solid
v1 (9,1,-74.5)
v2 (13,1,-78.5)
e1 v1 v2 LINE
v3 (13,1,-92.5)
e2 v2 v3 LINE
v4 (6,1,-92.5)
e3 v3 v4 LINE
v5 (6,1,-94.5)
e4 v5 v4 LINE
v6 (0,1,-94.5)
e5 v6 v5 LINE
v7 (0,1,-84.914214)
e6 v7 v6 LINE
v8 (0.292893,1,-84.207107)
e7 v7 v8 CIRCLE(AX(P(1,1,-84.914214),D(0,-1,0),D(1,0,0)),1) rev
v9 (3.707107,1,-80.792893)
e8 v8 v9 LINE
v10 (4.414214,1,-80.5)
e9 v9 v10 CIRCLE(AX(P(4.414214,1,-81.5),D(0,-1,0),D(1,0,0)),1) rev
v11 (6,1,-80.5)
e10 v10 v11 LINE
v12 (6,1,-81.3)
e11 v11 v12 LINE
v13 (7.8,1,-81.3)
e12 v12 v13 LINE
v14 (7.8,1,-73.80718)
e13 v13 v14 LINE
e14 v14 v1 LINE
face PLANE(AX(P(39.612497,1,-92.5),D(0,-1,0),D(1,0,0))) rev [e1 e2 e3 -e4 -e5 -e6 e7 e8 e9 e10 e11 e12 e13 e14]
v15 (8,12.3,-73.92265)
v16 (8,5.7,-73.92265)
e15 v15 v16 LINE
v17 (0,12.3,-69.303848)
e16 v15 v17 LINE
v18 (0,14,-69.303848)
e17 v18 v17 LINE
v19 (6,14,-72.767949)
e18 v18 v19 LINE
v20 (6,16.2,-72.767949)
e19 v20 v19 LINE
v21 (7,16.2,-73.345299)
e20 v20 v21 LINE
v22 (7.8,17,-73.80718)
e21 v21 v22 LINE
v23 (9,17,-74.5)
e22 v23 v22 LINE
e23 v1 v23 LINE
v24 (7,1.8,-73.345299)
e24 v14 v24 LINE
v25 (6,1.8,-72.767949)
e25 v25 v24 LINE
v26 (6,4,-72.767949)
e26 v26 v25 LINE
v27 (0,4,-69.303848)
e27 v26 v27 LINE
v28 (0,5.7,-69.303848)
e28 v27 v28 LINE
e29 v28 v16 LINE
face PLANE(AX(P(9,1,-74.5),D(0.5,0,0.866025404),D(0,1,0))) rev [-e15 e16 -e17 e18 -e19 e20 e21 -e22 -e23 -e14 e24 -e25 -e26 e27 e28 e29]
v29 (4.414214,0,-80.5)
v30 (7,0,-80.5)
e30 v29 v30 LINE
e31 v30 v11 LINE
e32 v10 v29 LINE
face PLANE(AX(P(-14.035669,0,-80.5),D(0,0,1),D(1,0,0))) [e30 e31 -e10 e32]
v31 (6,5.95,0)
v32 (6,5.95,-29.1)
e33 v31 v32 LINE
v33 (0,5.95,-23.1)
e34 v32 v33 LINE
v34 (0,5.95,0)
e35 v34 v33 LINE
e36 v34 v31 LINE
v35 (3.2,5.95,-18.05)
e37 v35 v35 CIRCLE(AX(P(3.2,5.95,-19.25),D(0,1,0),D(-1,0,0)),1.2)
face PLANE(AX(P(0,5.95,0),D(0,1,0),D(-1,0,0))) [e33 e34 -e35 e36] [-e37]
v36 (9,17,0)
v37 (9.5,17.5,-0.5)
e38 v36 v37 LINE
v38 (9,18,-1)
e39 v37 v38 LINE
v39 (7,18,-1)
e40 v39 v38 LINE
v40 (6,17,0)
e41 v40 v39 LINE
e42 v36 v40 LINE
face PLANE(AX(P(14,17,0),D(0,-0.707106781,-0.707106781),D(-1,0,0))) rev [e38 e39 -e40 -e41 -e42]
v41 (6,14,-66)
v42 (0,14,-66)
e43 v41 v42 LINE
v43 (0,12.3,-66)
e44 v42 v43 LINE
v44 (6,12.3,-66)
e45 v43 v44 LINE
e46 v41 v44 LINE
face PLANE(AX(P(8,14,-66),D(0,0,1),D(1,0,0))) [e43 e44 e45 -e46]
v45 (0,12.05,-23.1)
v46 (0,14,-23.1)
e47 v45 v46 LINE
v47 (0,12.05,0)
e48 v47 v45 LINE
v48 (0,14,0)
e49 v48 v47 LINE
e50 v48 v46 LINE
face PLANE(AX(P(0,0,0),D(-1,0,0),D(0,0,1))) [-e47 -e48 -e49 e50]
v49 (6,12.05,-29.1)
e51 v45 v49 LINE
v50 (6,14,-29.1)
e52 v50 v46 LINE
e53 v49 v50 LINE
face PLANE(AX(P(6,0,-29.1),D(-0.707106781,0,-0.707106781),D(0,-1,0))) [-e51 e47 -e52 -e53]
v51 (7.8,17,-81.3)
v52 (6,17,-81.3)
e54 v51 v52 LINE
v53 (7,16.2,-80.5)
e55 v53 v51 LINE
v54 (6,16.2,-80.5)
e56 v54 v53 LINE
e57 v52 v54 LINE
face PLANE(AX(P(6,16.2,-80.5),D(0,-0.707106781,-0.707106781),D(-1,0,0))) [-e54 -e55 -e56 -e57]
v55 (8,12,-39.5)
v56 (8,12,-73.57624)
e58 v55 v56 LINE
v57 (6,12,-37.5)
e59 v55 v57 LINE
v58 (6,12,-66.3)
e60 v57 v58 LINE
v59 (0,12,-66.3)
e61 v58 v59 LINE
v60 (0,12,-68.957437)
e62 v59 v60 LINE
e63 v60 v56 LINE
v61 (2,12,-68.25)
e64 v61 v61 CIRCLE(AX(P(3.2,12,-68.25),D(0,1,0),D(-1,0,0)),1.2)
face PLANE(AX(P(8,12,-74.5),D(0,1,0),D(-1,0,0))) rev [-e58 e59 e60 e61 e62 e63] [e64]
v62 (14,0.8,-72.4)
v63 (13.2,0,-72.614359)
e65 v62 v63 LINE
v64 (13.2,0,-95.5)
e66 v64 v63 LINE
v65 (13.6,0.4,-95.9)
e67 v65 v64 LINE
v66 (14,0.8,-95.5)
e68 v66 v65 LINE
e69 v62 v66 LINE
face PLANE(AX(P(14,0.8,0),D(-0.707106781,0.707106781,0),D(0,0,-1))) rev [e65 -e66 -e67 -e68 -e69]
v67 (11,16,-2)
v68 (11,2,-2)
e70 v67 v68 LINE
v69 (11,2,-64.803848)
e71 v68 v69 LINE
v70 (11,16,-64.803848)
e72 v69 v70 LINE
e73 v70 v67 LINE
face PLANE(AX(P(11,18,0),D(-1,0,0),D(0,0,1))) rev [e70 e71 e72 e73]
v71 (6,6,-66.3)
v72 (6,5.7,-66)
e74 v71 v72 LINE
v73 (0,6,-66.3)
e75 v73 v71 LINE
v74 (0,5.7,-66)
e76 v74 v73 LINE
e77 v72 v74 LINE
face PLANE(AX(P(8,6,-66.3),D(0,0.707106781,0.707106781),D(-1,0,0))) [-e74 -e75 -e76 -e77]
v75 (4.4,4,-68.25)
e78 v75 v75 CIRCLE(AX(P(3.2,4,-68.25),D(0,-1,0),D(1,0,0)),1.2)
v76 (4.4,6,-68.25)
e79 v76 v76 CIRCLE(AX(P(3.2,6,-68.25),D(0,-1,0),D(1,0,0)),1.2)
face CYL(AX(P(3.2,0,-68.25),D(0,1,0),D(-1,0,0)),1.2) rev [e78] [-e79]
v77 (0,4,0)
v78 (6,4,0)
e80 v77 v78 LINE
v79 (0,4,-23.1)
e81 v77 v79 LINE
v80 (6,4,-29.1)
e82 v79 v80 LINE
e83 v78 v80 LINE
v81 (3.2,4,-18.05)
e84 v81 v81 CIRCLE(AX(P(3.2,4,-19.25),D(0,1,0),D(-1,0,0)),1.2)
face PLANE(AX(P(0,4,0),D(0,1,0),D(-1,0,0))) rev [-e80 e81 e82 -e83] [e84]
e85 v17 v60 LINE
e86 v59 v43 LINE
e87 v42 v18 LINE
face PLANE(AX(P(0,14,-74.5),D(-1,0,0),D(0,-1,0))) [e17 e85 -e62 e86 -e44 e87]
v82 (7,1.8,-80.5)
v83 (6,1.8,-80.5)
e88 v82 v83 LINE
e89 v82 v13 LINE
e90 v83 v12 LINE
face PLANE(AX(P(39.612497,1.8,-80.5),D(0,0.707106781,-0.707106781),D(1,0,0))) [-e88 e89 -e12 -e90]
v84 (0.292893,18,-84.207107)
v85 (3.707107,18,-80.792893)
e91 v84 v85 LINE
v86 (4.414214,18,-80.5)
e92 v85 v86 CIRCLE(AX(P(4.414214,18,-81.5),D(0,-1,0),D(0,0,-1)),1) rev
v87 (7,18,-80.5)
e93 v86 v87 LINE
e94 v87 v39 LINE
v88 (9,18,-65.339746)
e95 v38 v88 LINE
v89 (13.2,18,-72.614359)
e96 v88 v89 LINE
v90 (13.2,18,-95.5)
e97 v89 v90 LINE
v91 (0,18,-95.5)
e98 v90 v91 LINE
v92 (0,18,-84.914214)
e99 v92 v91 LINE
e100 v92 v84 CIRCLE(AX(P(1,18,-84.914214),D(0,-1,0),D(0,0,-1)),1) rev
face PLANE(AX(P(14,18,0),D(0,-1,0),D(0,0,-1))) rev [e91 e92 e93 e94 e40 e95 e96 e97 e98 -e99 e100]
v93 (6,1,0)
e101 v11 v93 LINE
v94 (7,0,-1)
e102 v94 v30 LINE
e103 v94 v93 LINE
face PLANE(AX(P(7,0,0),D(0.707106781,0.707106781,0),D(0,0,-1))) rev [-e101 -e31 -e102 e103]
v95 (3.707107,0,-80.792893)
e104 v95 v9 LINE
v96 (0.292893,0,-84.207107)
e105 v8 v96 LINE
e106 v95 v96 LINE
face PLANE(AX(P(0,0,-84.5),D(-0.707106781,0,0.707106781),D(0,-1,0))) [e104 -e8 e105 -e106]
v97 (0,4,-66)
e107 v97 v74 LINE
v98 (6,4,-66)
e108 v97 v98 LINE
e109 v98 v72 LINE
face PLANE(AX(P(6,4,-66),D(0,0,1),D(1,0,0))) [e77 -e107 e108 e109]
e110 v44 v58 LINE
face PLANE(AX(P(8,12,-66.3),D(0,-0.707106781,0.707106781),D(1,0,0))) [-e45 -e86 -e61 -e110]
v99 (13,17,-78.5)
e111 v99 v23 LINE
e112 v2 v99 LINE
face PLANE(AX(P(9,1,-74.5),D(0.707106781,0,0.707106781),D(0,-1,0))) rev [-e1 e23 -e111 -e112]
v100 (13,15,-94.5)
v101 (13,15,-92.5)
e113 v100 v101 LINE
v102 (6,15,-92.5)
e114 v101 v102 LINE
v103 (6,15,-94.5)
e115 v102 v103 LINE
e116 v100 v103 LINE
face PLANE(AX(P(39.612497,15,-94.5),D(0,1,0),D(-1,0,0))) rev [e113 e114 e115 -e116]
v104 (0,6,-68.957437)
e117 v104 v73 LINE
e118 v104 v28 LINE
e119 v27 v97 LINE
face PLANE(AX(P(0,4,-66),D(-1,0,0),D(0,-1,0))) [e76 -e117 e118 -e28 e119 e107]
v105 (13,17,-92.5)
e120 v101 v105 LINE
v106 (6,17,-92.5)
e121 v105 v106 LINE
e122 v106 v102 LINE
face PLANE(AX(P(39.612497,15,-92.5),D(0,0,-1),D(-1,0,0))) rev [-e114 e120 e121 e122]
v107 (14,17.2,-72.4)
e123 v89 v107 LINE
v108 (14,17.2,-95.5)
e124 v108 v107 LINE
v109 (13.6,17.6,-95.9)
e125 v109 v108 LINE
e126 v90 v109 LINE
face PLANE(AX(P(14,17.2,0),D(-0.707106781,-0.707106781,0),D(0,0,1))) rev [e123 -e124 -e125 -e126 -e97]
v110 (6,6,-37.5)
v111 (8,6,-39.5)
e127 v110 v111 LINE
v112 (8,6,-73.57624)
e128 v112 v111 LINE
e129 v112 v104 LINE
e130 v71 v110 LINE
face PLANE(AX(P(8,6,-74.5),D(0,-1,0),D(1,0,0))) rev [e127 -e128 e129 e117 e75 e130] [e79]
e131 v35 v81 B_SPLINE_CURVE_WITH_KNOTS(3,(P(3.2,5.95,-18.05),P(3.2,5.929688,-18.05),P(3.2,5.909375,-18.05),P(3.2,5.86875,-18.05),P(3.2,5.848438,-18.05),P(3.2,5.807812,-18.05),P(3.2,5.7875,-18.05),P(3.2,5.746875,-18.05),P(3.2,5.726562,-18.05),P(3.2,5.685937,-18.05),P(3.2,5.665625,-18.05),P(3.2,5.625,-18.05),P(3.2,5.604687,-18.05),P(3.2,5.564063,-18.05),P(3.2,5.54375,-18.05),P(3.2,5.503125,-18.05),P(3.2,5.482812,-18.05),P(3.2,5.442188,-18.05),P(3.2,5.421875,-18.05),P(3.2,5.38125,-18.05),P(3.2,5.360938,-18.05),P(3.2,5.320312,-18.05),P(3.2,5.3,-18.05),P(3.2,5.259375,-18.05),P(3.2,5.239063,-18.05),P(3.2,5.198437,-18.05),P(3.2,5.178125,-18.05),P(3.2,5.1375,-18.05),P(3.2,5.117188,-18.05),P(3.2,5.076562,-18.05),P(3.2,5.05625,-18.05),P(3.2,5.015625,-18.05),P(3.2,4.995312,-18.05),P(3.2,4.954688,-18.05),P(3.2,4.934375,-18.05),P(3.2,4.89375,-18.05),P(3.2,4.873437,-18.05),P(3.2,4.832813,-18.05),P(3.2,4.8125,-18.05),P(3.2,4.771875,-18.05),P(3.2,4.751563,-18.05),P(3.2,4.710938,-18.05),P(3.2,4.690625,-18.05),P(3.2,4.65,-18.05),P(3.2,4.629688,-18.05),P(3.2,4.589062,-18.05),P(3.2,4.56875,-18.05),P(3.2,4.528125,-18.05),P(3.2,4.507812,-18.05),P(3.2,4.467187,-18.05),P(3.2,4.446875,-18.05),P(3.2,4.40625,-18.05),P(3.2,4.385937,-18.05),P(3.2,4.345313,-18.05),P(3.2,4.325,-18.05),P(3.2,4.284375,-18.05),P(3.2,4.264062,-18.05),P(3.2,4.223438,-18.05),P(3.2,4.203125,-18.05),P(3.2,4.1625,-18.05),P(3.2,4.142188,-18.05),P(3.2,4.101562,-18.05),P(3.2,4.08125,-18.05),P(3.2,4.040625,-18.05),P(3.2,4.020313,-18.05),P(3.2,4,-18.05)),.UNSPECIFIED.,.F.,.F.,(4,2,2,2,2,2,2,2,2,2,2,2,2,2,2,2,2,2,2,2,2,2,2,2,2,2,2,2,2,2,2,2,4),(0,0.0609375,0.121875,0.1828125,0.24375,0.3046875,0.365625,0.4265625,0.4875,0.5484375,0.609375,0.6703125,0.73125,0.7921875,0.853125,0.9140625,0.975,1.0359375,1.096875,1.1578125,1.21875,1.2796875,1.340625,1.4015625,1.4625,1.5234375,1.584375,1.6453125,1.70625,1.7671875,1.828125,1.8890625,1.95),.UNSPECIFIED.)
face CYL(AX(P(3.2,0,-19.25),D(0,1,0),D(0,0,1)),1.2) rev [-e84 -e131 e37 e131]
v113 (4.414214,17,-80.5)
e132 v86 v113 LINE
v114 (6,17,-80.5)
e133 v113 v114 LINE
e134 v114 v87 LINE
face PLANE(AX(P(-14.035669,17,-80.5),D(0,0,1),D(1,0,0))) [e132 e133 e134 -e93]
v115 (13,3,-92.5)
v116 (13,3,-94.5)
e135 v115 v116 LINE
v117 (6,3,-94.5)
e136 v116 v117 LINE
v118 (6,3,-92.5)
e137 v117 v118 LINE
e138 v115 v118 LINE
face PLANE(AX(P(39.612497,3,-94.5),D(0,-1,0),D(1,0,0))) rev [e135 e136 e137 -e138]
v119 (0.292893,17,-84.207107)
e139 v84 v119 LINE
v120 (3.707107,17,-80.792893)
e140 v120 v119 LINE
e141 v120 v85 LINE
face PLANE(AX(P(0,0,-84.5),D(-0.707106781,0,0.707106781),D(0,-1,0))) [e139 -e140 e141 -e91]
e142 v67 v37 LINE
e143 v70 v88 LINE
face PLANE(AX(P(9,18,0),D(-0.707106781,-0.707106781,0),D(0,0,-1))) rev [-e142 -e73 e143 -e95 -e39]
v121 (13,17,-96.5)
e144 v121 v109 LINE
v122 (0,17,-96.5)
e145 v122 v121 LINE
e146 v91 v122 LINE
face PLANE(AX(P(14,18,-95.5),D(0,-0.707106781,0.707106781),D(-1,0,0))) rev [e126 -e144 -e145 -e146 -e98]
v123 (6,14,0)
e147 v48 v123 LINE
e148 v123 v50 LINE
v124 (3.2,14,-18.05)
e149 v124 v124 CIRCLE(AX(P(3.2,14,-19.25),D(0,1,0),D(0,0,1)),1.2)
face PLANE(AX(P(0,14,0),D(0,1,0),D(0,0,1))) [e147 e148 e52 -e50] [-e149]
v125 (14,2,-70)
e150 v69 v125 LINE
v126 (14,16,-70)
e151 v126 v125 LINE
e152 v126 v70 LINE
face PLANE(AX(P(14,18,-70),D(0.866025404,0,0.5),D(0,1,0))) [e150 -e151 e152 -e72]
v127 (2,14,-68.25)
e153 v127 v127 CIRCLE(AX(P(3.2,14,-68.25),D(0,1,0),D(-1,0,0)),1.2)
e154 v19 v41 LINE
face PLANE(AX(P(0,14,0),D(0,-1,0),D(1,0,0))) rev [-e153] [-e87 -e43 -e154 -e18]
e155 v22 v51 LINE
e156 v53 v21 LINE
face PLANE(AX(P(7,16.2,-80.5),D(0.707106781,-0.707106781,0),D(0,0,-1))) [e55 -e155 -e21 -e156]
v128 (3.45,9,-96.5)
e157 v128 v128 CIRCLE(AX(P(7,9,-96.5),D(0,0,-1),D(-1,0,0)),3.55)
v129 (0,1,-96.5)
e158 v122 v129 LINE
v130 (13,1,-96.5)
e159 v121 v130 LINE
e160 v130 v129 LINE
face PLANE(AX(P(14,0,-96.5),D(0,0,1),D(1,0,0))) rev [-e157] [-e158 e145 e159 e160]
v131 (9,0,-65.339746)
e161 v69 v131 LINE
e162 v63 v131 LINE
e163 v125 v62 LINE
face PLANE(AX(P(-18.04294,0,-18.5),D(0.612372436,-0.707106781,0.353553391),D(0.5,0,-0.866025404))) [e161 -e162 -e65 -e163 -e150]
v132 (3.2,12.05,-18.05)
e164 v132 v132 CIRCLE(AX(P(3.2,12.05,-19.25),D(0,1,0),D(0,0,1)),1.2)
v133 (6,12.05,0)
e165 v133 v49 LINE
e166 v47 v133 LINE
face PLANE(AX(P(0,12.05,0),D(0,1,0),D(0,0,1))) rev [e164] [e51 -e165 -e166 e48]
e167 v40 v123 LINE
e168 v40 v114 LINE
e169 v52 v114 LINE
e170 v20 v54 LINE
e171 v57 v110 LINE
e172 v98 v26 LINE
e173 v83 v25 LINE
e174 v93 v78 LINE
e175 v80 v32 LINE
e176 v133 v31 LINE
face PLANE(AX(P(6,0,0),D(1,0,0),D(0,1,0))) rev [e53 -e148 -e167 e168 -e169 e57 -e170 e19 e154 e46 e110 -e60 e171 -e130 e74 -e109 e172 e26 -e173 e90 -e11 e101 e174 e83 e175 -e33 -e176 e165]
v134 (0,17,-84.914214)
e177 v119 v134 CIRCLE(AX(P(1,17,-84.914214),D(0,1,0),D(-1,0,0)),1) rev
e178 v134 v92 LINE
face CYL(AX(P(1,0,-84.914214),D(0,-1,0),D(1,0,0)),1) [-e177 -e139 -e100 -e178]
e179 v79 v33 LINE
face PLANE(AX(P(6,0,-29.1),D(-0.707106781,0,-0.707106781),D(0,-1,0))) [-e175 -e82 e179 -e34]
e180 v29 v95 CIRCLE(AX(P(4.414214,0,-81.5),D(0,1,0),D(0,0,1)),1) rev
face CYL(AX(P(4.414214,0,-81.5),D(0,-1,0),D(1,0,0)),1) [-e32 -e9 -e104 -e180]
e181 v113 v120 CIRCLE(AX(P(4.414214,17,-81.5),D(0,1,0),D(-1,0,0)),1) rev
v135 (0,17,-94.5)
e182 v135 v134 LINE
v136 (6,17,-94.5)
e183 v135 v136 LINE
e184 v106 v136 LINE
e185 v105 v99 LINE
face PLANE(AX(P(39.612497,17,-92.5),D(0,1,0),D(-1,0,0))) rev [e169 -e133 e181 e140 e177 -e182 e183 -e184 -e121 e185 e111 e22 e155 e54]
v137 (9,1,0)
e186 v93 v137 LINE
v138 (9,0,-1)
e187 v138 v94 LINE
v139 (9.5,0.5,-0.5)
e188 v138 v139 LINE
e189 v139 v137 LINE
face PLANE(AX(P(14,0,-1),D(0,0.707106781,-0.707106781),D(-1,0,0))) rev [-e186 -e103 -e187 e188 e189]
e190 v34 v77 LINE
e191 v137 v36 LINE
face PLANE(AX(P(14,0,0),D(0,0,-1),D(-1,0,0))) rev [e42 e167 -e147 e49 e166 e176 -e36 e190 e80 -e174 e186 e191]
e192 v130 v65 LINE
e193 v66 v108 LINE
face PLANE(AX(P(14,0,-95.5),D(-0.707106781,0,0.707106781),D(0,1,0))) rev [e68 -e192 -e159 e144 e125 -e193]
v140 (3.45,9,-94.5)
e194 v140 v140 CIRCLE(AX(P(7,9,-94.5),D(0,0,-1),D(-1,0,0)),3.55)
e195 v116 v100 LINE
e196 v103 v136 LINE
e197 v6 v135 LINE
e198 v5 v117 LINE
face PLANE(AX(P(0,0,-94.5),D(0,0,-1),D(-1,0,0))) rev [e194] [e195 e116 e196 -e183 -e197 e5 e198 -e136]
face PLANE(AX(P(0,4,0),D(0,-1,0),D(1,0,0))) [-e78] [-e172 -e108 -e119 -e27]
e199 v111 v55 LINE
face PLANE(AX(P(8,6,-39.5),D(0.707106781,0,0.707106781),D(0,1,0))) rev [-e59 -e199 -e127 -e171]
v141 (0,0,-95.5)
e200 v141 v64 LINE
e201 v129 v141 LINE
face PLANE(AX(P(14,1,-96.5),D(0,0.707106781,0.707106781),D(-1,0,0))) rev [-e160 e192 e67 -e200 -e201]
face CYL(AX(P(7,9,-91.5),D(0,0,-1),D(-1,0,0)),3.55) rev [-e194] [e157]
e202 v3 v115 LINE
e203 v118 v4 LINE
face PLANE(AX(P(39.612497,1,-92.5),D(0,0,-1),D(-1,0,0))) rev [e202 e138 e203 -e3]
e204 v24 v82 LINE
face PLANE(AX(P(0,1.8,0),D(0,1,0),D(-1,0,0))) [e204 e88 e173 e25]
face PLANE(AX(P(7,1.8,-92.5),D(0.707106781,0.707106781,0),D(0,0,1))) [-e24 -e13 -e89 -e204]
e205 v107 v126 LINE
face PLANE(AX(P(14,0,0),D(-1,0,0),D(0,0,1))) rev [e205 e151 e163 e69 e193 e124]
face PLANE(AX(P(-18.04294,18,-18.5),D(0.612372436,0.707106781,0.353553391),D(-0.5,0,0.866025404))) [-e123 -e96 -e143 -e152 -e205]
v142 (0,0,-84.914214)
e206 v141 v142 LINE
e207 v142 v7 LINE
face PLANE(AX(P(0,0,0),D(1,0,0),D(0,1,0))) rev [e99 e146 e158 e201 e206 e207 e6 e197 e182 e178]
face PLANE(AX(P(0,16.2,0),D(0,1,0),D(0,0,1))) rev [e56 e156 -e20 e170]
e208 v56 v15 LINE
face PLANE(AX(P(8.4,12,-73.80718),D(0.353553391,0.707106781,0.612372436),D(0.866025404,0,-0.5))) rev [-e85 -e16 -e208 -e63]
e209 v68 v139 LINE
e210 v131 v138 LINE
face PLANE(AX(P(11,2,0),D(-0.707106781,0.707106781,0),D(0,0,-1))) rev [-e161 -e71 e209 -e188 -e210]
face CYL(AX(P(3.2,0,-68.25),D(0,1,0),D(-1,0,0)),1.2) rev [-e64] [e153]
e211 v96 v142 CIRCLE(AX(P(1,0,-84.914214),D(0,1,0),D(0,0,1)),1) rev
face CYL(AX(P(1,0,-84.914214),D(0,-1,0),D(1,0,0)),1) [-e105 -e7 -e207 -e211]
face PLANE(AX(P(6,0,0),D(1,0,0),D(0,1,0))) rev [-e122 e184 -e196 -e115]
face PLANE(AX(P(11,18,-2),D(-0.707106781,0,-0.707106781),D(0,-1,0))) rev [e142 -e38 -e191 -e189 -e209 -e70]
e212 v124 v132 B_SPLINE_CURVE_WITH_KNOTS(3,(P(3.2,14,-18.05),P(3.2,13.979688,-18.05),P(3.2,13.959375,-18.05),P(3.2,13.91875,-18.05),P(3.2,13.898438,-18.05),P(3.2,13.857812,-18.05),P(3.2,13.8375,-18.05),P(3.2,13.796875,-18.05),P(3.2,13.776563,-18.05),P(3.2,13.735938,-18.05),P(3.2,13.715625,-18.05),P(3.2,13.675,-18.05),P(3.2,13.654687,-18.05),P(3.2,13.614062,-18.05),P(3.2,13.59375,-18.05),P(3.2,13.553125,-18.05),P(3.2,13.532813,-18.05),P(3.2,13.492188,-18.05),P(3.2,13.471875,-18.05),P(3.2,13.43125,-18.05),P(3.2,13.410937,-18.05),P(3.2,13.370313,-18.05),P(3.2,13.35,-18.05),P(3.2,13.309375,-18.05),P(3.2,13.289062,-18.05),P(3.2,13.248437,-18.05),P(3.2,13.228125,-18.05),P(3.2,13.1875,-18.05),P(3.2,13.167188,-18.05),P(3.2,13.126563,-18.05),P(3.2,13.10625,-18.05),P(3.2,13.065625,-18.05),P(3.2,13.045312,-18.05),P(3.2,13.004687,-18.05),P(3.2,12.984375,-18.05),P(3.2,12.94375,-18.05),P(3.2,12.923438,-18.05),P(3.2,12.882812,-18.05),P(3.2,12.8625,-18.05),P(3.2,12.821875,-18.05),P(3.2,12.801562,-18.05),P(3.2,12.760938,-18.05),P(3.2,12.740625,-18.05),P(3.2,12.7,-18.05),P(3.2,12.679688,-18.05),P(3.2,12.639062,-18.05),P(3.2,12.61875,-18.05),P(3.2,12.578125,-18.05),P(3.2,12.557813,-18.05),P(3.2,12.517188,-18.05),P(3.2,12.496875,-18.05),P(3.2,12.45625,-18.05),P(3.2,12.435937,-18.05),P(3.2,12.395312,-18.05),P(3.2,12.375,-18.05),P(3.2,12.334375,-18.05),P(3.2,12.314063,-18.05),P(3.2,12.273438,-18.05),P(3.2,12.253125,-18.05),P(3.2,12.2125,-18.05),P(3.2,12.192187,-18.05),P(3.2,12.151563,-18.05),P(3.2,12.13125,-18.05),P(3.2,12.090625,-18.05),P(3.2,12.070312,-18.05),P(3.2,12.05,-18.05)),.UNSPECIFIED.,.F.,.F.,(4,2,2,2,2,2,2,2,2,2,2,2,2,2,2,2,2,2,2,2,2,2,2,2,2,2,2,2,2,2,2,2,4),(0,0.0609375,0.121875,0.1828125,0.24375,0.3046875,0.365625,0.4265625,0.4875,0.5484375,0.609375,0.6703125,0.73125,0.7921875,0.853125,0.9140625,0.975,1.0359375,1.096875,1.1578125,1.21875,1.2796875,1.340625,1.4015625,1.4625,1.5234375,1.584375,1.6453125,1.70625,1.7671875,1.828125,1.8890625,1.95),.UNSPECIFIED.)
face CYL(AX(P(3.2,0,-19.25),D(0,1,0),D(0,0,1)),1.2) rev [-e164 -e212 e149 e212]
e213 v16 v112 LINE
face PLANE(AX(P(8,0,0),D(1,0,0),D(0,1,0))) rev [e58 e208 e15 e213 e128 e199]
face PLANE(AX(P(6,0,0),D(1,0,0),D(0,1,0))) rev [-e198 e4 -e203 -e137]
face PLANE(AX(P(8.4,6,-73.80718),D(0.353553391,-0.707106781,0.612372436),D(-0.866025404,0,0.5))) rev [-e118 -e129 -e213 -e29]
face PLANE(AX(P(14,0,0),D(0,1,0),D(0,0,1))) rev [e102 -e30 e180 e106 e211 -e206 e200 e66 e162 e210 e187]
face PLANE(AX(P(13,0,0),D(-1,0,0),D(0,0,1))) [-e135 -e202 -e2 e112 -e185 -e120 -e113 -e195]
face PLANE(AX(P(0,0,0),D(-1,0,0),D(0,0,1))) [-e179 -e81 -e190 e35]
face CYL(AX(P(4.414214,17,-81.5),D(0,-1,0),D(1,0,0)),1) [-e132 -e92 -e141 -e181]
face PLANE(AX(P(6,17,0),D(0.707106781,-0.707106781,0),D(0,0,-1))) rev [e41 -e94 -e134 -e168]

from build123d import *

# Parameters (mm, degrees)
SKETCH_2_W           = 96.5
SKETCH_2_H           = 18
EXTRUDE_1_DEPTH      = 14
SKETCH_6_W           = 6
SKETCH_6_H           = 4
CUT_EXTRUDE_3_DEPTH  = 100.157702676
CUT_EXTRUDE_START    = -4
SKETCH_6_4_W         = 6
SKETCH_6_4_H         = 6.1
CUT_EXTRUDE_5_DEPTH  = 96.157702676
SKETCH_7_W           = 73.4
SKETCH_7_H           = 10
CUT_EXTRUDE_4_DEPTH  = 6
SKETCH_8_R           = 1.2
CUT_EXTRUDE_6_DEPTH  = 99.510151761
SKETCH_10_W          = 2
SKETCH_10_H          = 18
EXTRUDE_3_DEPTH      = 6
CUT_EXTRUDE_7_DEPTH  = 7
CHAMFER_4_SIZE       = 1
SKETCH_12_R          = 3.55
CUT_EXTRUDE_8_DEPTH  = 5
CHAMFER_6_SIZE       = 0.8
CHAMFER_7_SIZE       = 1
EXTRUDE_4_REACH      = 106.158
EXTRUDE_START        = -5
SKETCH_13_W          = 14
SKETCH_13_H          = 1
CHAMFER_8_SIZE       = 6
CHAMFER_9_SIZE       = 4
CHAMFER_10_SIZE      = 3
CHAMFER_10_SIZE2     = 1.732050808
SKETCH_14_W          = 35
SKETCH_14_H          = 6
CUT_EXTRUDE_9_DEPTH  = 2
CHAMFER_11_SIZE      = 4
SKETCH_15_W          = 3
SKETCH_15_H          = 70
CUT_EXTRUDE_10_DEPTH = 100.157702676
CHAMFER_12_SIZE2     = 3
CHAMFER_12_SIZE      = 5.196152423
CHAMFER_14_SIZE      = 2
SKETCH_16_W          = 1
SKETCH_16_H          = 12
EXTRUDE_5_DEPTH      = 0.8
EXTRUDE_START_2      = 16
SKETCH_16_2_W        = 1
SKETCH_16_2_H        = 12
EXTRUDE_6_DEPTH      = 0.8
CHAMFER_15_SIZE      = 0.8
FILLET_1_R           = 1
EXTRUDE_7_DEPTH      = 2
EXTRUDE_START_3      = 6
EXTRUDE_8_DEPTH      = 2
SKETCH_18_R          = 1.2
CUT_EXTRUDE_11_DEPTH = 99.510151761
CHAMFER_16_SIZE      = 0.3


# Some blends are built 0.0001 mm under size
with BuildPart() as part:
    # 草图2 → 凸台-拉伸1 (new body)
    with BuildSketch(Plane(origin=(0, 0, 0), x_dir=(0, 0, -1), z_dir=(1, 0, 0))):
        with Locations((48.25, 9)):
            Rectangle(SKETCH_2_W, SKETCH_2_H)
    extrude(amount=EXTRUDE_1_DEPTH)

    # 草图6 → 切除-拉伸3 (cut, through all)
    with BuildSketch(Plane(origin=(0, 0, -96.5), x_dir=(-1, 0, 0), z_dir=(0, 0, -1))):
        with Locations((-3, 16)):
            Rectangle(SKETCH_6_W, SKETCH_6_H)
        with Locations((-3, 2)):
            Rectangle(SKETCH_6_W, SKETCH_6_H)
    extrude(amount=-CUT_EXTRUDE_3_DEPTH, mode=Mode.SUBTRACT)

    # 草图6<4> → 切除-拉伸5 (cut, through all)
    with BuildSketch(Plane(origin=(0, 0, -96.5), x_dir=(-1, 0, 0), z_dir=(0, 0, -1)).offset(CUT_EXTRUDE_START)):
        with Locations((-3, 9)):
            Rectangle(SKETCH_6_4_W, SKETCH_6_4_H)
    extrude(amount=-CUT_EXTRUDE_5_DEPTH, mode=Mode.SUBTRACT)

    # 草图7 → 切除-拉伸4 (cut)
    with BuildSketch(Plane.ZY):
        with Locations((-59.8, 9)):
            Rectangle(SKETCH_7_W, SKETCH_7_H)
    extrude(amount=-CUT_EXTRUDE_4_DEPTH, mode=Mode.SUBTRACT)

    # 草图8 → 切除-拉伸6 (cut, through all)
    with BuildSketch(Plane(origin=(0, 14, 0), x_dir=(1, 0, 0), z_dir=(0, 1, 0))):
        with Locations(Location((3.2, 19.25, 0), (0, 0, 270))):
            Circle(SKETCH_8_R)
    extrude(amount=-CUT_EXTRUDE_6_DEPTH, mode=Mode.SUBTRACT)

    # 草图10 → 凸台-拉伸3 (add)
    with BuildSketch(Plane.ZY.offset(-6)):
        with Locations((-95.5, 9)):
            Rectangle(SKETCH_10_W, SKETCH_10_H)
    extrude(amount=EXTRUDE_3_DEPTH)

    # 草图11 → 切除-拉伸7 (cut)
    with BuildSketch(Plane.ZY.offset(-6)):
        Polygon((-94.5, 3), (-92.5, 3), (-92.5, 1), (-74.5, 1), (-74.5, 17), (-92.5, 17), (-92.5, 15), (-94.5, 15), align=None)
    extrude(amount=-CUT_EXTRUDE_7_DEPTH, mode=Mode.SUBTRACT)

    # 倒角4
    chamfer_4_edges = [part.edges().sort_by_distance(p)[0] for p in [
        (14, 9, -96.5),
        (6, 18, -47.25),
        (6, 0, -47.25),
        (7, 18, -96.5),
        (7, 0, -96.5),
    ]]
    chamfer(chamfer_4_edges, length=CHAMFER_4_SIZE - 0.0001)  # a hair under: the kernel refuses the full size

    # 草图12 → 切除-拉伸8 (cut)
    with BuildSketch(Plane(origin=(0, 0, -96.5), x_dir=(-1, 0, 0), z_dir=(0, 0, -1))):
        with Locations((-7, 9)):
            Circle(SKETCH_12_R)
    extrude(amount=-CUT_EXTRUDE_8_DEPTH, mode=Mode.SUBTRACT)

    # 倒角6
    chamfer_6_edges = [part.edges().sort_by_distance(p)[0] for p in [
        (14, 18, -47.75005),
        (14, 0, -47.75005),
    ]]
    chamfer(chamfer_6_edges, length=CHAMFER_6_SIZE)

    # 倒角7
    chamfer_7_edges = [part.edges().sort_by_distance(p)[0] for p in [
        (10.09995, 0, 0),
        (10.09995, 18, 0),
    ]]
    chamfer(chamfer_7_edges, length=CHAMFER_7_SIZE)

    # 凸台-拉伸4: up to this face of the body (flat: up to its plane)
    extrude_4_end = Plane(part.part.faces().sort_by_distance((0, 9, -95.480955347))[0])
    # 草图13 → 凸台-拉伸4 (add, up to the picked face)
    with BuildSketch(Plane(origin=(14, 0, 0), x_dir=(0, 0, -1), z_dir=(1, 0, 0)).offset(EXTRUDE_START), mode=Mode.PRIVATE) as extrude_4_sk1:
        with Locations((87.5, 0.5)):
            Rectangle(SKETCH_13_W, SKETCH_13_H)
    extrude_4_tool1 = split(extrude(extrude_4_sk1.sketch, amount=-EXTRUDE_4_REACH, mode=Mode.PRIVATE), bisect_by=extrude_4_end, keep=Keep.BOTH, mode=Mode.PRIVATE)
    # 草图13 → 凸台-拉伸4 (add, up to the picked face)
    with BuildSketch(Plane(origin=(14, 0, 0), x_dir=(0, 0, -1), z_dir=(1, 0, 0)).offset(EXTRUDE_START), mode=Mode.PRIVATE) as extrude_4_sk2:
        with Locations((87.5, 17.5)):
            Rectangle(SKETCH_13_W, SKETCH_13_H)
    extrude_4_tool2 = split(extrude(extrude_4_sk2.sketch, amount=-EXTRUDE_4_REACH, mode=Mode.PRIVATE), bisect_by=extrude_4_end, keep=Keep.BOTH, mode=Mode.PRIVATE)
    add(extrude_4_tool1.solids().sort_by(Axis((9, 0.5, -87.5), (-1, 0, 0)))[0])
    add(extrude_4_tool2.solids().sort_by(Axis((9, 17.5, -87.5), (-1, 0, 0)))[0])

    # 倒角8
    # the kernel refuses this chamfer: 6 mm, written as the material it adds along each edge
    with BuildSketch(Plane(origin=(6, 14, -23.1), x_dir=(0.027495876610585775, 0, -0.9996219169112968), z_dir=(0, -1, 0))) as chamfer_8_piece_1_section:
        Polygon((CHAMFER_8_SIZE * 0.999621916911, -CHAMFER_8_SIZE * 0.0274958766106), (-CHAMFER_8_SIZE * 0.0274958766106, -CHAMFER_8_SIZE * 0.999621916911), (0, 0), align=None)
    chamfer_8_piece_1 = extrude(amount=1.95, mode=Mode.PRIVATE)
    chamfer_8_piece_1 = split(chamfer_8_piece_1, bisect_by=Plane(origin=(1.869207623, 12.869307623, -23.733347392), z_dir=(-0.7071067811865476, 0.7071067811865476, 0)), keep=Keep.TOP, mode=Mode.PRIVATE)
    chamfer_8_piece_1 = split(chamfer_8_piece_1, bisect_by=Plane(origin=(0, 13.288222987, -23.733347392), z_dir=(1, 0, 0)), keep=Keep.TOP, mode=Mode.PRIVATE)
    add(chamfer_8_piece_1)
    with BuildSketch(Plane(origin=(6, 14, -23.1), x_dir=(0.027495876610585775, 0, -0.9996219169112968), z_dir=(0, -1, 0))) as chamfer_8_piece_2_section:
        Polygon((CHAMFER_8_SIZE * 0.999621916911, -CHAMFER_8_SIZE * 0.0274958766106), (-CHAMFER_8_SIZE * 0.0274958766106, -CHAMFER_8_SIZE * 0.999621916911), (0, 0), align=None)
    chamfer_8_piece_2 = extrude(amount=1.95, mode=Mode.PRIVATE)
    chamfer_8_piece_2 = split(chamfer_8_piece_2, bisect_by=Plane(origin=(3.203468607, 14.203568607, -25.288657403), z_dir=(0.7071067811865476, -0.7071067811865476, 0)), keep=Keep.TOP, mode=Mode.PRIVATE)
    add(chamfer_8_piece_2)
    with BuildSketch(Plane(origin=(6, 14, -23.1), x_dir=(0.027495876610585775, 0, -0.9996219169112968), z_dir=(0, -1, 0))) as chamfer_8_piece_3_section:
        Polygon((CHAMFER_8_SIZE * 0.999621916911, -CHAMFER_8_SIZE * 0.0274958766106), (-CHAMFER_8_SIZE * 0.0274958766106, -CHAMFER_8_SIZE * 0.999621916911), (0, 0), align=None)
    chamfer_8_piece_3 = extrude(amount=17.380097928, mode=Mode.PRIVATE)
    chamfer_8_piece_3 = split(chamfer_8_piece_3, bisect_by=Plane(origin=(3.203468607, 3.796431393, -25.288657403), z_dir=(0.7071067811865475, 0.7071067811865476, 0)), keep=Keep.TOP, mode=Mode.PRIVATE)
    chamfer_8_piece_3 = split(chamfer_8_piece_3, bisect_by=Plane(origin=(4.422275915, 5.95, -25.288657403), z_dir=(0, -1, 0)), keep=Keep.TOP, mode=Mode.PRIVATE)
    chamfer_8_piece_3 = split(chamfer_8_piece_3, bisect_by=Plane(origin=(4.422275915, 4, -25.288657403), z_dir=(0, 1, 0)), keep=Keep.TOP, mode=Mode.PRIVATE)
    add(chamfer_8_piece_3)
    with BuildSketch(Plane(origin=(6, 14, -23.1), x_dir=(0.027495876610585775, 0, -0.9996219169112968), z_dir=(0, -1, 0))) as chamfer_8_piece_4_section:
        Polygon((CHAMFER_8_SIZE * 0.999621916911, -CHAMFER_8_SIZE * 0.0274958766106), (-CHAMFER_8_SIZE * 0.0274958766106, -CHAMFER_8_SIZE * 0.999621916911), (0, 0), align=None)
    chamfer_8_piece_4 = extrude(amount=17.380097928, mode=Mode.PRIVATE)
    chamfer_8_piece_4 = split(chamfer_8_piece_4, bisect_by=Plane(origin=(1.869207623, 5.130692377, -23.733347392), z_dir=(-0.7071067811865475, -0.7071067811865476, 0)), keep=Keep.TOP, mode=Mode.PRIVATE)
    chamfer_8_piece_4 = split(chamfer_8_piece_4, bisect_by=Plane(origin=(0, 4.711777013, -23.733347392), z_dir=(1, 0, 0)), keep=Keep.TOP, mode=Mode.PRIVATE)
    chamfer_8_piece_4 = split(chamfer_8_piece_4, bisect_by=Plane(origin=(1.450292259, 5.95, -23.733347392), z_dir=(0, -1, 0)), keep=Keep.TOP, mode=Mode.PRIVATE)
    chamfer_8_piece_4 = split(chamfer_8_piece_4, bisect_by=Plane(origin=(1.450292259, 4, -23.733347392), z_dir=(0, 1, 0)), keep=Keep.TOP, mode=Mode.PRIVATE)
    add(chamfer_8_piece_4)
    with BuildSketch(Plane(origin=(6, 21.380097928, -23.1), x_dir=(0.02749587661058635, 0, -0.9996219169112968), z_dir=(0, -1, 0))) as chamfer_8_piece_5_section:
        Polygon((CHAMFER_8_SIZE * 0.999621916911, -CHAMFER_8_SIZE * 0.0274958766106), (-CHAMFER_8_SIZE * 0.0274958766106, -CHAMFER_8_SIZE * 0.999621916911), (0, 0), align=None)
    chamfer_8_piece_5 = extrude(amount=17.380097928, mode=Mode.PRIVATE)
    chamfer_8_piece_5 = split(chamfer_8_piece_5, bisect_by=Plane(origin=(1.869207623, 12.869307623, -23.733347392), z_dir=(-0.7071067811865476, 0.7071067811865476, 0)), keep=Keep.TOP, mode=Mode.PRIVATE)
    chamfer_8_piece_5 = split(chamfer_8_piece_5, bisect_by=Plane(origin=(1.450292259, 14, -23.733347392), z_dir=(0, -1, 0)), keep=Keep.TOP, mode=Mode.PRIVATE)
    chamfer_8_piece_5 = split(chamfer_8_piece_5, bisect_by=Plane(origin=(0, 13.288222987, -23.733347392), z_dir=(1, 0, 0)), keep=Keep.TOP, mode=Mode.PRIVATE)
    chamfer_8_piece_5 = split(chamfer_8_piece_5, bisect_by=Plane(origin=(1.450292259, 12.05, -23.733347392), z_dir=(0, 1, 0)), keep=Keep.TOP, mode=Mode.PRIVATE)
    add(chamfer_8_piece_5)
    with BuildSketch(Plane(origin=(6, 21.380097928, -23.1), x_dir=(0.02749587661058635, 0, -0.9996219169112968), z_dir=(0, -1, 0))) as chamfer_8_piece_6_section:
        Polygon((CHAMFER_8_SIZE * 0.999621916911, -CHAMFER_8_SIZE * 0.0274958766106), (-CHAMFER_8_SIZE * 0.0274958766106, -CHAMFER_8_SIZE * 0.999621916911), (0, 0), align=None)
    chamfer_8_piece_6 = extrude(amount=17.380097928, mode=Mode.PRIVATE)
    chamfer_8_piece_6 = split(chamfer_8_piece_6, bisect_by=Plane(origin=(3.203468607, 14.203568607, -25.288657403), z_dir=(0.7071067811865476, -0.7071067811865476, 0)), keep=Keep.TOP, mode=Mode.PRIVATE)
    chamfer_8_piece_6 = split(chamfer_8_piece_6, bisect_by=Plane(origin=(4.422275915, 14, -25.288657403), z_dir=(0, -1, 0)), keep=Keep.TOP, mode=Mode.PRIVATE)
    chamfer_8_piece_6 = split(chamfer_8_piece_6, bisect_by=Plane(origin=(4.422275915, 12.05, -25.288657403), z_dir=(0, 1, 0)), keep=Keep.TOP, mode=Mode.PRIVATE)
    add(chamfer_8_piece_6)
    with BuildSketch(Plane(origin=(6, 5.95, -23.1), x_dir=(0.027495876610586095, 0, -0.9996219169112968), z_dir=(0, -1, 0))) as chamfer_8_piece_7_section:
        Polygon((CHAMFER_8_SIZE * 0.999621916911, -CHAMFER_8_SIZE * 0.0274958766106), (-CHAMFER_8_SIZE * 0.0274958766106, -CHAMFER_8_SIZE * 0.999621916911), (0, 0), align=None)
    chamfer_8_piece_7 = extrude(amount=1.95, mode=Mode.PRIVATE)
    chamfer_8_piece_7 = split(chamfer_8_piece_7, bisect_by=Plane(origin=(3.203468607, 3.796431393, -25.288657403), z_dir=(0.7071067811865475, 0.7071067811865476, 0)), keep=Keep.TOP, mode=Mode.PRIVATE)
    add(chamfer_8_piece_7)
    with BuildSketch(Plane(origin=(6, 5.95, -23.1), x_dir=(0.027495876610586095, 0, -0.9996219169112968), z_dir=(0, -1, 0))) as chamfer_8_piece_8_section:
        Polygon((CHAMFER_8_SIZE * 0.999621916911, -CHAMFER_8_SIZE * 0.0274958766106), (-CHAMFER_8_SIZE * 0.0274958766106, -CHAMFER_8_SIZE * 0.999621916911), (0, 0), align=None)
    chamfer_8_piece_8 = extrude(amount=1.95, mode=Mode.PRIVATE)
    chamfer_8_piece_8 = split(chamfer_8_piece_8, bisect_by=Plane(origin=(1.869207623, 5.130692377, -23.733347392), z_dir=(-0.7071067811865475, -0.7071067811865476, 0)), keep=Keep.TOP, mode=Mode.PRIVATE)
    chamfer_8_piece_8 = split(chamfer_8_piece_8, bisect_by=Plane(origin=(0, 4.711777013, -23.733347392), z_dir=(1, 0, 0)), keep=Keep.TOP, mode=Mode.PRIVATE)
    add(chamfer_8_piece_8)

    # 倒角9
    chamfer_9_edges = [part.edges().sort_by_distance(p)[0] for p in [
        (0, 0.5, -80.5),
        (0, 17.5, -80.5),
    ]]
    chamfer(chamfer_9_edges, length=CHAMFER_9_SIZE)

    # 倒角10
    chamfer_10_edges = [part.edges().sort_by_distance(p)[0] for p in [
        (6, 9, -74.5),
    ]]
    chamfer_10_side = [part.faces().sort_by_distance(p)[0] for p in [
        (9.5, 9, -74.5),
    ]]
    chamfer(chamfer_10_edges, length=CHAMFER_10_SIZE, length2=CHAMFER_10_SIZE2, reference=chamfer_10_side[0])

    # 草图14 → 切除-拉伸9 (cut)
    with BuildSketch(Plane.ZY.offset(-6)):
        with Locations((-57, 9)):
            Rectangle(SKETCH_14_W, SKETCH_14_H)
    extrude(amount=-CUT_EXTRUDE_9_DEPTH, mode=Mode.SUBTRACT)

    # 倒角11
    chamfer_11_edges = [part.edges().sort_by_distance(p)[0] for p in [
        (13, 9, -74.5),
    ]]
    chamfer(chamfer_11_edges, length=CHAMFER_11_SIZE - 0.0001)  # a hair under: the kernel refuses the full size

    # 草图15 → 切除-拉伸10 (cut, through all)
    with BuildSketch(Plane.XZ):
        with Locations((12.5, -35)):
            Rectangle(SKETCH_15_W, SKETCH_15_H)
    extrude(amount=-CUT_EXTRUDE_10_DEPTH, mode=Mode.SUBTRACT)

    # 倒角12
    chamfer_12_edges = [part.edges().sort_by_distance(p)[0] for p in [
        (11, 9, -70),
    ]]
    chamfer_12_side = [part.faces().sort_by_distance(p)[0] for p in [
        (11, 9, -69.94),
    ]]
    chamfer(chamfer_12_edges, length=CHAMFER_12_SIZE - 0.0001, length2=CHAMFER_12_SIZE2 - 0.0001, reference=chamfer_12_side[0])  # a hair under: the kernel refuses the full size

    # 倒角13
    # the kernel refuses this chamfer: 2 mm, written as the material it takes off along each edge
    with BuildSketch(Plane(origin=(11, 18, 4.143365976), x_dir=(-0.9996219169112968, 0.027495876610585623, 0), z_dir=(0, 0, -1))) as chamfer_13_piece_1_section:
        with BuildLine():
            Line((2.05734639, 0), (-0.11309431, -2.054235587))
            Line((-0.11309431, -2.054235587), (-0.153079186, -2.053135752))
            ThreePointArc((-0.153079186, -2.053135752), (-0.068258454, -1.026795659), (-0.039984877, 0.001099835))
            Line((-0.039984877, 0.001099835), (0.001099835, 0.039984877))
            ThreePointArc((0.001099835, 0.039984877), (1.028995329, 0.011711299), (2.058446225, 0.039984877))
            Line((2.058446225, 0.039984877), (2.05734639, 0))
        make_face()
    chamfer_13_piece_1 = extrude(amount=74.090679529, mode=Mode.PRIVATE)
    chamfer_13_piece_1 = split(chamfer_13_piece_1, bisect_by=Plane(origin=(-4.335610986, 17.336943865, -38.241515955), z_dir=(0.866028454061691, 0, 0.4999947167276046)), keep=Keep.TOP, mode=Mode.PRIVATE)
    add(chamfer_13_piece_1, mode=Mode.SUBTRACT)
    with BuildSketch(Plane(origin=(11, -4.143365976, 0), x_dir=(0.027495876610586494, 0, -0.9996219169112968), z_dir=(0, 1, 0))) as chamfer_13_piece_2:
        with BuildLine():
            Line((2.05734639, 0), (-0.11309431, 2.054235587))
            Line((-0.11309431, 2.054235587), (-0.153079186, 2.053135752))
            ThreePointArc((-0.153079186, 2.053135752), (-0.068258454, 1.026795659), (-0.039984877, -0.001099835))
            Line((-0.039984877, -0.001099835), (0.001099835, -0.039984877))
            ThreePointArc((0.001099835, -0.039984877), (1.028995329, -0.011711299), (2.058446225, -0.039984877))
            Line((2.058446225, -0.039984877), (2.05734639, 0))
        make_face()
    extrude(amount=26.286731952, mode=Mode.SUBTRACT)
    with BuildSketch(Plane(origin=(11, 0, 4.143365976), x_dir=(0.027495876610586494, 0.9996219169112968, 0), z_dir=(0, 0, -1))) as chamfer_13_piece_3_section:
        with BuildLine():
            Line((2.05734639, 0), (-0.11309431, -2.054235587))
            Line((-0.11309431, -2.054235587), (-0.153079186, -2.053135752))
            ThreePointArc((-0.153079186, -2.053135752), (-0.068258454, -1.026795659), (-0.039984877, 0.001099835))
            Line((-0.039984877, 0.001099835), (0.001099835, 0.039984877))
            ThreePointArc((0.001099835, 0.039984877), (1.028995329, 0.011711299), (2.058446225, 0.039984877))
            Line((2.058446225, 0.039984877), (2.05734639, 0))
        make_face()
    chamfer_13_piece_3 = extrude(amount=74.090679529, mode=Mode.PRIVATE)
    chamfer_13_piece_3 = split(chamfer_13_piece_3, bisect_by=Plane(origin=(-4.335610986, 0.663056135, -38.241515955), z_dir=(0.866028454061691, 0, 0.4999947167276046)), keep=Keep.TOP, mode=Mode.PRIVATE)
    add(chamfer_13_piece_3, mode=Mode.SUBTRACT)
    with BuildSketch(Plane(origin=(8.428344186, 0, -60.349646292), x_dir=(0.023812211514136525, 0.9996219169112968, 0.013747793037086956), z_dir=(0.4999947167276046, 0, -0.866028454061691))) as chamfer_13_piece_4_section:
        with BuildLine():
            Line((2.05734639, 0), (-0.11309431, -2.054235587))
            Line((-0.11309431, -2.054235587), (-0.153079186, -2.053135752))
            ThreePointArc((-0.153079186, -2.053135752), (-0.068258454, -1.026795659), (-0.039984877, 0.001099835))
            Line((-0.039984877, 0.001099835), (0.001099835, 0.039984877))
            ThreePointArc((0.001099835, 0.039984877), (1.028995329, 0.011711299), (2.058446225, 0.039984877))
            Line((2.058446225, 0.039984877), (2.05734639, 0))
        make_face()
    chamfer_13_piece_4 = extrude(amount=14.686778445, mode=Mode.PRIVATE)
    chamfer_13_piece_4 = split(chamfer_13_piece_4, bisect_by=Plane(origin=(11, 0.729642002, -67.930526251), z_dir=(1, 0, 0)), keep=Keep.TOP, mode=Mode.PRIVATE)
    add(chamfer_13_piece_4, mode=Mode.SUBTRACT)
    with BuildSketch(Plane(origin=(8.428344186, 18, -60.349646292), x_dir=(-0.8657010233488743, 0.027495876610585605, -0.4998056771807688), z_dir=(0.4999947167276046, 0, -0.866028454061691))) as chamfer_13_piece_5_section:
        with BuildLine():
            Line((2.05734639, 0), (-0.11309431, -2.054235587))
            Line((-0.11309431, -2.054235587), (-0.153079186, -2.053135752))
            ThreePointArc((-0.153079186, -2.053135752), (-0.068258454, -1.026795659), (-0.039984877, 0.001099835))
            Line((-0.039984877, 0.001099835), (0.001099835, 0.039984877))
            ThreePointArc((0.001099835, 0.039984877), (1.028995329, 0.011711299), (2.058446225, 0.039984877))
            Line((2.058446225, 0.039984877), (2.05734639, 0))
        make_face()
    chamfer_13_piece_5 = extrude(amount=14.686778445, mode=Mode.PRIVATE)
    chamfer_13_piece_5 = split(chamfer_13_piece_5, bisect_by=Plane(origin=(11, 17.270357998, -67.930526251), z_dir=(1, 0, 0)), keep=Keep.TOP, mode=Mode.PRIVATE)
    add(chamfer_13_piece_5, mode=Mode.SUBTRACT)
    with BuildSketch(Plane(origin=(11, 18, 4.143365976), x_dir=(-0.9996219169112968, 0.027495876610585623, 0), z_dir=(0, 0, -1))) as chamfer_13_piece_6a_section:
        with BuildLine():
            Line((2.05734639, 0), (-0.11309431, -2.054235587))
            Line((-0.11309431, -2.054235587), (-0.153079186, -2.053135752))
            ThreePointArc((-0.153079186, -2.053135752), (-0.068258454, -1.026795659), (-0.039984877, 0.001099835))
            Line((-0.039984877, 0.001099835), (0.001099835, 0.039984877))
            ThreePointArc((0.001099835, 0.039984877), (1.028995329, 0.011711299), (2.058446225, 0.039984877))
            Line((2.058446225, 0.039984877), (2.05734639, 0))
        make_face()
    chamfer_13_piece_6a = extrude(amount=74.090679529, mode=Mode.PRIVATE)
    chamfer_13_piece_6a = split(chamfer_13_piece_6a, bisect_by=Plane(origin=(11.657577697, 17.377831414, -65.942921604), z_dir=(-0.866028454061691, 0, -0.4999947167276046)), keep=Keep.TOP, mode=Mode.PRIVATE)
    with BuildSketch(Plane(origin=(8.428344186, 18, -60.349646292), x_dir=(-0.8657010233488743, 0.027495876610585605, -0.4998056771807688), z_dir=(0.4999947167276046, 0, -0.866028454061691))) as chamfer_13_piece_6b_section:
        with BuildLine():
            Line((2.05734639, 0), (-0.11309431, -2.054235587))
            Line((-0.11309431, -2.054235587), (-0.153079186, -2.053135752))
            ThreePointArc((-0.153079186, -2.053135752), (-0.068258454, -1.026795659), (-0.039984877, 0.001099835))
            Line((-0.039984877, 0.001099835), (0.001099835, 0.039984877))
            ThreePointArc((0.001099835, 0.039984877), (1.028995329, 0.011711299), (2.058446225, 0.039984877))
            Line((2.058446225, 0.039984877), (2.05734639, 0))
        make_face()
    chamfer_13_piece_6b = extrude(amount=14.686778445, mode=Mode.PRIVATE)
    chamfer_13_piece_6b = split(chamfer_13_piece_6b, bisect_by=Plane(origin=(11, 17.377831414, -63.488778287), z_dir=(-1, 0, 0)), keep=Keep.TOP, mode=Mode.PRIVATE)
    chamfer_13_piece_6 = chamfer_13_piece_6a & chamfer_13_piece_6b
    add(chamfer_13_piece_6, mode=Mode.SUBTRACT)
    with BuildSketch(Plane(origin=(11, 0, 4.143365976), x_dir=(0.027495876610586494, 0.9996219169112968, 0), z_dir=(0, 0, -1))) as chamfer_13_piece_7a_section:
        with BuildLine():
            Line((2.05734639, 0), (-0.11309431, -2.054235587))
            Line((-0.11309431, -2.054235587), (-0.153079186, -2.053135752))
            ThreePointArc((-0.153079186, -2.053135752), (-0.068258454, -1.026795659), (-0.039984877, 0.001099835))
            Line((-0.039984877, 0.001099835), (0.001099835, 0.039984877))
            ThreePointArc((0.001099835, 0.039984877), (1.028995329, 0.011711299), (2.058446225, 0.039984877))
            Line((2.058446225, 0.039984877), (2.05734639, 0))
        make_face()
    chamfer_13_piece_7a = extrude(amount=74.090679529, mode=Mode.PRIVATE)
    chamfer_13_piece_7a = split(chamfer_13_piece_7a, bisect_by=Plane(origin=(11.657577697, 0.622168586, -65.942921604), z_dir=(-0.866028454061691, 0, -0.4999947167276046)), keep=Keep.TOP, mode=Mode.PRIVATE)
    with BuildSketch(Plane(origin=(8.428344186, 0, -60.349646292), x_dir=(0.023812211514136525, 0.9996219169112968, 0.013747793037086956), z_dir=(0.4999947167276046, 0, -0.866028454061691))) as chamfer_13_piece_7b_section:
        with BuildLine():
            Line((2.05734639, 0), (-0.11309431, -2.054235587))
            Line((-0.11309431, -2.054235587), (-0.153079186, -2.053135752))
            ThreePointArc((-0.153079186, -2.053135752), (-0.068258454, -1.026795659), (-0.039984877, 0.001099835))
            Line((-0.039984877, 0.001099835), (0.001099835, 0.039984877))
            ThreePointArc((0.001099835, 0.039984877), (1.028995329, 0.011711299), (2.058446225, 0.039984877))
            Line((2.058446225, 0.039984877), (2.05734639, 0))
        make_face()
    chamfer_13_piece_7b = extrude(amount=14.686778445, mode=Mode.PRIVATE)
    chamfer_13_piece_7b = split(chamfer_13_piece_7b, bisect_by=Plane(origin=(11, 0.622168586, -63.488778287), z_dir=(-1, 0, 0)), keep=Keep.TOP, mode=Mode.PRIVATE)
    chamfer_13_piece_7 = chamfer_13_piece_7a & chamfer_13_piece_7b
    add(chamfer_13_piece_7, mode=Mode.SUBTRACT)

    # 倒角14
    chamfer_14_edges = [part.edges().sort_by_distance(p)[0] for p in [
        (6, 9, -39.5),
    ]]
    chamfer(chamfer_14_edges, length=CHAMFER_14_SIZE - 0.0001)  # a hair under: the kernel refuses the full size

    # 草图16 → 凸台-拉伸5 (add)
    with BuildSketch(Plane.XZ.offset(-17)):
        with Locations((6.5, -74.5)):
            Rectangle(SKETCH_16_W, SKETCH_16_H)
    extrude(amount=EXTRUDE_5_DEPTH)

    # 草图16<2> → 凸台-拉伸6 (add)
    with BuildSketch(Plane.XZ.offset(-17).offset(EXTRUDE_START_2)):
        with Locations((6.5, -74.5)):
            Rectangle(SKETCH_16_2_W, SKETCH_16_2_H)
    extrude(amount=-EXTRUDE_6_DEPTH)

    # 倒角15
    chamfer_15_edges = [part.edges().sort_by_distance(p)[0] for p in [
        (7, 17, -76.922649731),
        (6.5, 17, -80.5),
        (6.5, 1, -80.5),
        (7, 1, -76.922649731),
    ]]
    chamfer(chamfer_15_edges, length=CHAMFER_15_SIZE - 0.0001)  # a hair under: the kernel refuses the full size

    # 圆角1
    fillet_1_edges = [part.edges().sort_by_distance(p)[0] for p in [
        (0, 0.5, -84.5),
        (0, 17.5, -84.5),
        (4, 17.5, -80.5),
        (4, 0.5, -80.5),
    ]]
    fillet(fillet_1_edges, radius=FILLET_1_R)

    # 草图17 → 凸台-拉伸7 (add)
    with BuildSketch(Plane(origin=(0, 6, 0), x_dir=(1, 0, 0), z_dir=(0, 1, 0))):
        Polygon((6, 72.767949192), (6, 66), (0, 66), (0, 69.303847577), align=None)
    extrude(amount=-EXTRUDE_7_DEPTH)

    # 草图17<2> → 凸台-拉伸8 (add)
    with BuildSketch(Plane(origin=(0, 6, 0), x_dir=(1, 0, 0), z_dir=(0, 1, 0)).offset(EXTRUDE_START_3)):
        Polygon((6, 72.767949192), (6, 66), (0, 66), (0, 69.303847577), align=None)
    extrude(amount=EXTRUDE_8_DEPTH)

    # 草图18 → 切除-拉伸11 (cut, through all)
    with BuildSketch(Plane(origin=(0, 14, 0), x_dir=(1, 0, 0), z_dir=(0, 1, 0))):
        with Locations(Location((3.2, 68.25, 0), (0, 0, 180))):
            Circle(SKETCH_18_R)
    extrude(amount=-CUT_EXTRUDE_11_DEPTH, mode=Mode.SUBTRACT)

    # 倒角16
    chamfer_16_edges = [part.edges().sort_by_distance(p)[0] for p in [
        (4, 6, -71.613248654),
        (4, 12, -71.613248654),
        (3, 6, -66),
        (3, 12, -66),
    ]]
    chamfer(chamfer_16_edges, length=CHAMFER_16_SIZE)


solid = part.part
